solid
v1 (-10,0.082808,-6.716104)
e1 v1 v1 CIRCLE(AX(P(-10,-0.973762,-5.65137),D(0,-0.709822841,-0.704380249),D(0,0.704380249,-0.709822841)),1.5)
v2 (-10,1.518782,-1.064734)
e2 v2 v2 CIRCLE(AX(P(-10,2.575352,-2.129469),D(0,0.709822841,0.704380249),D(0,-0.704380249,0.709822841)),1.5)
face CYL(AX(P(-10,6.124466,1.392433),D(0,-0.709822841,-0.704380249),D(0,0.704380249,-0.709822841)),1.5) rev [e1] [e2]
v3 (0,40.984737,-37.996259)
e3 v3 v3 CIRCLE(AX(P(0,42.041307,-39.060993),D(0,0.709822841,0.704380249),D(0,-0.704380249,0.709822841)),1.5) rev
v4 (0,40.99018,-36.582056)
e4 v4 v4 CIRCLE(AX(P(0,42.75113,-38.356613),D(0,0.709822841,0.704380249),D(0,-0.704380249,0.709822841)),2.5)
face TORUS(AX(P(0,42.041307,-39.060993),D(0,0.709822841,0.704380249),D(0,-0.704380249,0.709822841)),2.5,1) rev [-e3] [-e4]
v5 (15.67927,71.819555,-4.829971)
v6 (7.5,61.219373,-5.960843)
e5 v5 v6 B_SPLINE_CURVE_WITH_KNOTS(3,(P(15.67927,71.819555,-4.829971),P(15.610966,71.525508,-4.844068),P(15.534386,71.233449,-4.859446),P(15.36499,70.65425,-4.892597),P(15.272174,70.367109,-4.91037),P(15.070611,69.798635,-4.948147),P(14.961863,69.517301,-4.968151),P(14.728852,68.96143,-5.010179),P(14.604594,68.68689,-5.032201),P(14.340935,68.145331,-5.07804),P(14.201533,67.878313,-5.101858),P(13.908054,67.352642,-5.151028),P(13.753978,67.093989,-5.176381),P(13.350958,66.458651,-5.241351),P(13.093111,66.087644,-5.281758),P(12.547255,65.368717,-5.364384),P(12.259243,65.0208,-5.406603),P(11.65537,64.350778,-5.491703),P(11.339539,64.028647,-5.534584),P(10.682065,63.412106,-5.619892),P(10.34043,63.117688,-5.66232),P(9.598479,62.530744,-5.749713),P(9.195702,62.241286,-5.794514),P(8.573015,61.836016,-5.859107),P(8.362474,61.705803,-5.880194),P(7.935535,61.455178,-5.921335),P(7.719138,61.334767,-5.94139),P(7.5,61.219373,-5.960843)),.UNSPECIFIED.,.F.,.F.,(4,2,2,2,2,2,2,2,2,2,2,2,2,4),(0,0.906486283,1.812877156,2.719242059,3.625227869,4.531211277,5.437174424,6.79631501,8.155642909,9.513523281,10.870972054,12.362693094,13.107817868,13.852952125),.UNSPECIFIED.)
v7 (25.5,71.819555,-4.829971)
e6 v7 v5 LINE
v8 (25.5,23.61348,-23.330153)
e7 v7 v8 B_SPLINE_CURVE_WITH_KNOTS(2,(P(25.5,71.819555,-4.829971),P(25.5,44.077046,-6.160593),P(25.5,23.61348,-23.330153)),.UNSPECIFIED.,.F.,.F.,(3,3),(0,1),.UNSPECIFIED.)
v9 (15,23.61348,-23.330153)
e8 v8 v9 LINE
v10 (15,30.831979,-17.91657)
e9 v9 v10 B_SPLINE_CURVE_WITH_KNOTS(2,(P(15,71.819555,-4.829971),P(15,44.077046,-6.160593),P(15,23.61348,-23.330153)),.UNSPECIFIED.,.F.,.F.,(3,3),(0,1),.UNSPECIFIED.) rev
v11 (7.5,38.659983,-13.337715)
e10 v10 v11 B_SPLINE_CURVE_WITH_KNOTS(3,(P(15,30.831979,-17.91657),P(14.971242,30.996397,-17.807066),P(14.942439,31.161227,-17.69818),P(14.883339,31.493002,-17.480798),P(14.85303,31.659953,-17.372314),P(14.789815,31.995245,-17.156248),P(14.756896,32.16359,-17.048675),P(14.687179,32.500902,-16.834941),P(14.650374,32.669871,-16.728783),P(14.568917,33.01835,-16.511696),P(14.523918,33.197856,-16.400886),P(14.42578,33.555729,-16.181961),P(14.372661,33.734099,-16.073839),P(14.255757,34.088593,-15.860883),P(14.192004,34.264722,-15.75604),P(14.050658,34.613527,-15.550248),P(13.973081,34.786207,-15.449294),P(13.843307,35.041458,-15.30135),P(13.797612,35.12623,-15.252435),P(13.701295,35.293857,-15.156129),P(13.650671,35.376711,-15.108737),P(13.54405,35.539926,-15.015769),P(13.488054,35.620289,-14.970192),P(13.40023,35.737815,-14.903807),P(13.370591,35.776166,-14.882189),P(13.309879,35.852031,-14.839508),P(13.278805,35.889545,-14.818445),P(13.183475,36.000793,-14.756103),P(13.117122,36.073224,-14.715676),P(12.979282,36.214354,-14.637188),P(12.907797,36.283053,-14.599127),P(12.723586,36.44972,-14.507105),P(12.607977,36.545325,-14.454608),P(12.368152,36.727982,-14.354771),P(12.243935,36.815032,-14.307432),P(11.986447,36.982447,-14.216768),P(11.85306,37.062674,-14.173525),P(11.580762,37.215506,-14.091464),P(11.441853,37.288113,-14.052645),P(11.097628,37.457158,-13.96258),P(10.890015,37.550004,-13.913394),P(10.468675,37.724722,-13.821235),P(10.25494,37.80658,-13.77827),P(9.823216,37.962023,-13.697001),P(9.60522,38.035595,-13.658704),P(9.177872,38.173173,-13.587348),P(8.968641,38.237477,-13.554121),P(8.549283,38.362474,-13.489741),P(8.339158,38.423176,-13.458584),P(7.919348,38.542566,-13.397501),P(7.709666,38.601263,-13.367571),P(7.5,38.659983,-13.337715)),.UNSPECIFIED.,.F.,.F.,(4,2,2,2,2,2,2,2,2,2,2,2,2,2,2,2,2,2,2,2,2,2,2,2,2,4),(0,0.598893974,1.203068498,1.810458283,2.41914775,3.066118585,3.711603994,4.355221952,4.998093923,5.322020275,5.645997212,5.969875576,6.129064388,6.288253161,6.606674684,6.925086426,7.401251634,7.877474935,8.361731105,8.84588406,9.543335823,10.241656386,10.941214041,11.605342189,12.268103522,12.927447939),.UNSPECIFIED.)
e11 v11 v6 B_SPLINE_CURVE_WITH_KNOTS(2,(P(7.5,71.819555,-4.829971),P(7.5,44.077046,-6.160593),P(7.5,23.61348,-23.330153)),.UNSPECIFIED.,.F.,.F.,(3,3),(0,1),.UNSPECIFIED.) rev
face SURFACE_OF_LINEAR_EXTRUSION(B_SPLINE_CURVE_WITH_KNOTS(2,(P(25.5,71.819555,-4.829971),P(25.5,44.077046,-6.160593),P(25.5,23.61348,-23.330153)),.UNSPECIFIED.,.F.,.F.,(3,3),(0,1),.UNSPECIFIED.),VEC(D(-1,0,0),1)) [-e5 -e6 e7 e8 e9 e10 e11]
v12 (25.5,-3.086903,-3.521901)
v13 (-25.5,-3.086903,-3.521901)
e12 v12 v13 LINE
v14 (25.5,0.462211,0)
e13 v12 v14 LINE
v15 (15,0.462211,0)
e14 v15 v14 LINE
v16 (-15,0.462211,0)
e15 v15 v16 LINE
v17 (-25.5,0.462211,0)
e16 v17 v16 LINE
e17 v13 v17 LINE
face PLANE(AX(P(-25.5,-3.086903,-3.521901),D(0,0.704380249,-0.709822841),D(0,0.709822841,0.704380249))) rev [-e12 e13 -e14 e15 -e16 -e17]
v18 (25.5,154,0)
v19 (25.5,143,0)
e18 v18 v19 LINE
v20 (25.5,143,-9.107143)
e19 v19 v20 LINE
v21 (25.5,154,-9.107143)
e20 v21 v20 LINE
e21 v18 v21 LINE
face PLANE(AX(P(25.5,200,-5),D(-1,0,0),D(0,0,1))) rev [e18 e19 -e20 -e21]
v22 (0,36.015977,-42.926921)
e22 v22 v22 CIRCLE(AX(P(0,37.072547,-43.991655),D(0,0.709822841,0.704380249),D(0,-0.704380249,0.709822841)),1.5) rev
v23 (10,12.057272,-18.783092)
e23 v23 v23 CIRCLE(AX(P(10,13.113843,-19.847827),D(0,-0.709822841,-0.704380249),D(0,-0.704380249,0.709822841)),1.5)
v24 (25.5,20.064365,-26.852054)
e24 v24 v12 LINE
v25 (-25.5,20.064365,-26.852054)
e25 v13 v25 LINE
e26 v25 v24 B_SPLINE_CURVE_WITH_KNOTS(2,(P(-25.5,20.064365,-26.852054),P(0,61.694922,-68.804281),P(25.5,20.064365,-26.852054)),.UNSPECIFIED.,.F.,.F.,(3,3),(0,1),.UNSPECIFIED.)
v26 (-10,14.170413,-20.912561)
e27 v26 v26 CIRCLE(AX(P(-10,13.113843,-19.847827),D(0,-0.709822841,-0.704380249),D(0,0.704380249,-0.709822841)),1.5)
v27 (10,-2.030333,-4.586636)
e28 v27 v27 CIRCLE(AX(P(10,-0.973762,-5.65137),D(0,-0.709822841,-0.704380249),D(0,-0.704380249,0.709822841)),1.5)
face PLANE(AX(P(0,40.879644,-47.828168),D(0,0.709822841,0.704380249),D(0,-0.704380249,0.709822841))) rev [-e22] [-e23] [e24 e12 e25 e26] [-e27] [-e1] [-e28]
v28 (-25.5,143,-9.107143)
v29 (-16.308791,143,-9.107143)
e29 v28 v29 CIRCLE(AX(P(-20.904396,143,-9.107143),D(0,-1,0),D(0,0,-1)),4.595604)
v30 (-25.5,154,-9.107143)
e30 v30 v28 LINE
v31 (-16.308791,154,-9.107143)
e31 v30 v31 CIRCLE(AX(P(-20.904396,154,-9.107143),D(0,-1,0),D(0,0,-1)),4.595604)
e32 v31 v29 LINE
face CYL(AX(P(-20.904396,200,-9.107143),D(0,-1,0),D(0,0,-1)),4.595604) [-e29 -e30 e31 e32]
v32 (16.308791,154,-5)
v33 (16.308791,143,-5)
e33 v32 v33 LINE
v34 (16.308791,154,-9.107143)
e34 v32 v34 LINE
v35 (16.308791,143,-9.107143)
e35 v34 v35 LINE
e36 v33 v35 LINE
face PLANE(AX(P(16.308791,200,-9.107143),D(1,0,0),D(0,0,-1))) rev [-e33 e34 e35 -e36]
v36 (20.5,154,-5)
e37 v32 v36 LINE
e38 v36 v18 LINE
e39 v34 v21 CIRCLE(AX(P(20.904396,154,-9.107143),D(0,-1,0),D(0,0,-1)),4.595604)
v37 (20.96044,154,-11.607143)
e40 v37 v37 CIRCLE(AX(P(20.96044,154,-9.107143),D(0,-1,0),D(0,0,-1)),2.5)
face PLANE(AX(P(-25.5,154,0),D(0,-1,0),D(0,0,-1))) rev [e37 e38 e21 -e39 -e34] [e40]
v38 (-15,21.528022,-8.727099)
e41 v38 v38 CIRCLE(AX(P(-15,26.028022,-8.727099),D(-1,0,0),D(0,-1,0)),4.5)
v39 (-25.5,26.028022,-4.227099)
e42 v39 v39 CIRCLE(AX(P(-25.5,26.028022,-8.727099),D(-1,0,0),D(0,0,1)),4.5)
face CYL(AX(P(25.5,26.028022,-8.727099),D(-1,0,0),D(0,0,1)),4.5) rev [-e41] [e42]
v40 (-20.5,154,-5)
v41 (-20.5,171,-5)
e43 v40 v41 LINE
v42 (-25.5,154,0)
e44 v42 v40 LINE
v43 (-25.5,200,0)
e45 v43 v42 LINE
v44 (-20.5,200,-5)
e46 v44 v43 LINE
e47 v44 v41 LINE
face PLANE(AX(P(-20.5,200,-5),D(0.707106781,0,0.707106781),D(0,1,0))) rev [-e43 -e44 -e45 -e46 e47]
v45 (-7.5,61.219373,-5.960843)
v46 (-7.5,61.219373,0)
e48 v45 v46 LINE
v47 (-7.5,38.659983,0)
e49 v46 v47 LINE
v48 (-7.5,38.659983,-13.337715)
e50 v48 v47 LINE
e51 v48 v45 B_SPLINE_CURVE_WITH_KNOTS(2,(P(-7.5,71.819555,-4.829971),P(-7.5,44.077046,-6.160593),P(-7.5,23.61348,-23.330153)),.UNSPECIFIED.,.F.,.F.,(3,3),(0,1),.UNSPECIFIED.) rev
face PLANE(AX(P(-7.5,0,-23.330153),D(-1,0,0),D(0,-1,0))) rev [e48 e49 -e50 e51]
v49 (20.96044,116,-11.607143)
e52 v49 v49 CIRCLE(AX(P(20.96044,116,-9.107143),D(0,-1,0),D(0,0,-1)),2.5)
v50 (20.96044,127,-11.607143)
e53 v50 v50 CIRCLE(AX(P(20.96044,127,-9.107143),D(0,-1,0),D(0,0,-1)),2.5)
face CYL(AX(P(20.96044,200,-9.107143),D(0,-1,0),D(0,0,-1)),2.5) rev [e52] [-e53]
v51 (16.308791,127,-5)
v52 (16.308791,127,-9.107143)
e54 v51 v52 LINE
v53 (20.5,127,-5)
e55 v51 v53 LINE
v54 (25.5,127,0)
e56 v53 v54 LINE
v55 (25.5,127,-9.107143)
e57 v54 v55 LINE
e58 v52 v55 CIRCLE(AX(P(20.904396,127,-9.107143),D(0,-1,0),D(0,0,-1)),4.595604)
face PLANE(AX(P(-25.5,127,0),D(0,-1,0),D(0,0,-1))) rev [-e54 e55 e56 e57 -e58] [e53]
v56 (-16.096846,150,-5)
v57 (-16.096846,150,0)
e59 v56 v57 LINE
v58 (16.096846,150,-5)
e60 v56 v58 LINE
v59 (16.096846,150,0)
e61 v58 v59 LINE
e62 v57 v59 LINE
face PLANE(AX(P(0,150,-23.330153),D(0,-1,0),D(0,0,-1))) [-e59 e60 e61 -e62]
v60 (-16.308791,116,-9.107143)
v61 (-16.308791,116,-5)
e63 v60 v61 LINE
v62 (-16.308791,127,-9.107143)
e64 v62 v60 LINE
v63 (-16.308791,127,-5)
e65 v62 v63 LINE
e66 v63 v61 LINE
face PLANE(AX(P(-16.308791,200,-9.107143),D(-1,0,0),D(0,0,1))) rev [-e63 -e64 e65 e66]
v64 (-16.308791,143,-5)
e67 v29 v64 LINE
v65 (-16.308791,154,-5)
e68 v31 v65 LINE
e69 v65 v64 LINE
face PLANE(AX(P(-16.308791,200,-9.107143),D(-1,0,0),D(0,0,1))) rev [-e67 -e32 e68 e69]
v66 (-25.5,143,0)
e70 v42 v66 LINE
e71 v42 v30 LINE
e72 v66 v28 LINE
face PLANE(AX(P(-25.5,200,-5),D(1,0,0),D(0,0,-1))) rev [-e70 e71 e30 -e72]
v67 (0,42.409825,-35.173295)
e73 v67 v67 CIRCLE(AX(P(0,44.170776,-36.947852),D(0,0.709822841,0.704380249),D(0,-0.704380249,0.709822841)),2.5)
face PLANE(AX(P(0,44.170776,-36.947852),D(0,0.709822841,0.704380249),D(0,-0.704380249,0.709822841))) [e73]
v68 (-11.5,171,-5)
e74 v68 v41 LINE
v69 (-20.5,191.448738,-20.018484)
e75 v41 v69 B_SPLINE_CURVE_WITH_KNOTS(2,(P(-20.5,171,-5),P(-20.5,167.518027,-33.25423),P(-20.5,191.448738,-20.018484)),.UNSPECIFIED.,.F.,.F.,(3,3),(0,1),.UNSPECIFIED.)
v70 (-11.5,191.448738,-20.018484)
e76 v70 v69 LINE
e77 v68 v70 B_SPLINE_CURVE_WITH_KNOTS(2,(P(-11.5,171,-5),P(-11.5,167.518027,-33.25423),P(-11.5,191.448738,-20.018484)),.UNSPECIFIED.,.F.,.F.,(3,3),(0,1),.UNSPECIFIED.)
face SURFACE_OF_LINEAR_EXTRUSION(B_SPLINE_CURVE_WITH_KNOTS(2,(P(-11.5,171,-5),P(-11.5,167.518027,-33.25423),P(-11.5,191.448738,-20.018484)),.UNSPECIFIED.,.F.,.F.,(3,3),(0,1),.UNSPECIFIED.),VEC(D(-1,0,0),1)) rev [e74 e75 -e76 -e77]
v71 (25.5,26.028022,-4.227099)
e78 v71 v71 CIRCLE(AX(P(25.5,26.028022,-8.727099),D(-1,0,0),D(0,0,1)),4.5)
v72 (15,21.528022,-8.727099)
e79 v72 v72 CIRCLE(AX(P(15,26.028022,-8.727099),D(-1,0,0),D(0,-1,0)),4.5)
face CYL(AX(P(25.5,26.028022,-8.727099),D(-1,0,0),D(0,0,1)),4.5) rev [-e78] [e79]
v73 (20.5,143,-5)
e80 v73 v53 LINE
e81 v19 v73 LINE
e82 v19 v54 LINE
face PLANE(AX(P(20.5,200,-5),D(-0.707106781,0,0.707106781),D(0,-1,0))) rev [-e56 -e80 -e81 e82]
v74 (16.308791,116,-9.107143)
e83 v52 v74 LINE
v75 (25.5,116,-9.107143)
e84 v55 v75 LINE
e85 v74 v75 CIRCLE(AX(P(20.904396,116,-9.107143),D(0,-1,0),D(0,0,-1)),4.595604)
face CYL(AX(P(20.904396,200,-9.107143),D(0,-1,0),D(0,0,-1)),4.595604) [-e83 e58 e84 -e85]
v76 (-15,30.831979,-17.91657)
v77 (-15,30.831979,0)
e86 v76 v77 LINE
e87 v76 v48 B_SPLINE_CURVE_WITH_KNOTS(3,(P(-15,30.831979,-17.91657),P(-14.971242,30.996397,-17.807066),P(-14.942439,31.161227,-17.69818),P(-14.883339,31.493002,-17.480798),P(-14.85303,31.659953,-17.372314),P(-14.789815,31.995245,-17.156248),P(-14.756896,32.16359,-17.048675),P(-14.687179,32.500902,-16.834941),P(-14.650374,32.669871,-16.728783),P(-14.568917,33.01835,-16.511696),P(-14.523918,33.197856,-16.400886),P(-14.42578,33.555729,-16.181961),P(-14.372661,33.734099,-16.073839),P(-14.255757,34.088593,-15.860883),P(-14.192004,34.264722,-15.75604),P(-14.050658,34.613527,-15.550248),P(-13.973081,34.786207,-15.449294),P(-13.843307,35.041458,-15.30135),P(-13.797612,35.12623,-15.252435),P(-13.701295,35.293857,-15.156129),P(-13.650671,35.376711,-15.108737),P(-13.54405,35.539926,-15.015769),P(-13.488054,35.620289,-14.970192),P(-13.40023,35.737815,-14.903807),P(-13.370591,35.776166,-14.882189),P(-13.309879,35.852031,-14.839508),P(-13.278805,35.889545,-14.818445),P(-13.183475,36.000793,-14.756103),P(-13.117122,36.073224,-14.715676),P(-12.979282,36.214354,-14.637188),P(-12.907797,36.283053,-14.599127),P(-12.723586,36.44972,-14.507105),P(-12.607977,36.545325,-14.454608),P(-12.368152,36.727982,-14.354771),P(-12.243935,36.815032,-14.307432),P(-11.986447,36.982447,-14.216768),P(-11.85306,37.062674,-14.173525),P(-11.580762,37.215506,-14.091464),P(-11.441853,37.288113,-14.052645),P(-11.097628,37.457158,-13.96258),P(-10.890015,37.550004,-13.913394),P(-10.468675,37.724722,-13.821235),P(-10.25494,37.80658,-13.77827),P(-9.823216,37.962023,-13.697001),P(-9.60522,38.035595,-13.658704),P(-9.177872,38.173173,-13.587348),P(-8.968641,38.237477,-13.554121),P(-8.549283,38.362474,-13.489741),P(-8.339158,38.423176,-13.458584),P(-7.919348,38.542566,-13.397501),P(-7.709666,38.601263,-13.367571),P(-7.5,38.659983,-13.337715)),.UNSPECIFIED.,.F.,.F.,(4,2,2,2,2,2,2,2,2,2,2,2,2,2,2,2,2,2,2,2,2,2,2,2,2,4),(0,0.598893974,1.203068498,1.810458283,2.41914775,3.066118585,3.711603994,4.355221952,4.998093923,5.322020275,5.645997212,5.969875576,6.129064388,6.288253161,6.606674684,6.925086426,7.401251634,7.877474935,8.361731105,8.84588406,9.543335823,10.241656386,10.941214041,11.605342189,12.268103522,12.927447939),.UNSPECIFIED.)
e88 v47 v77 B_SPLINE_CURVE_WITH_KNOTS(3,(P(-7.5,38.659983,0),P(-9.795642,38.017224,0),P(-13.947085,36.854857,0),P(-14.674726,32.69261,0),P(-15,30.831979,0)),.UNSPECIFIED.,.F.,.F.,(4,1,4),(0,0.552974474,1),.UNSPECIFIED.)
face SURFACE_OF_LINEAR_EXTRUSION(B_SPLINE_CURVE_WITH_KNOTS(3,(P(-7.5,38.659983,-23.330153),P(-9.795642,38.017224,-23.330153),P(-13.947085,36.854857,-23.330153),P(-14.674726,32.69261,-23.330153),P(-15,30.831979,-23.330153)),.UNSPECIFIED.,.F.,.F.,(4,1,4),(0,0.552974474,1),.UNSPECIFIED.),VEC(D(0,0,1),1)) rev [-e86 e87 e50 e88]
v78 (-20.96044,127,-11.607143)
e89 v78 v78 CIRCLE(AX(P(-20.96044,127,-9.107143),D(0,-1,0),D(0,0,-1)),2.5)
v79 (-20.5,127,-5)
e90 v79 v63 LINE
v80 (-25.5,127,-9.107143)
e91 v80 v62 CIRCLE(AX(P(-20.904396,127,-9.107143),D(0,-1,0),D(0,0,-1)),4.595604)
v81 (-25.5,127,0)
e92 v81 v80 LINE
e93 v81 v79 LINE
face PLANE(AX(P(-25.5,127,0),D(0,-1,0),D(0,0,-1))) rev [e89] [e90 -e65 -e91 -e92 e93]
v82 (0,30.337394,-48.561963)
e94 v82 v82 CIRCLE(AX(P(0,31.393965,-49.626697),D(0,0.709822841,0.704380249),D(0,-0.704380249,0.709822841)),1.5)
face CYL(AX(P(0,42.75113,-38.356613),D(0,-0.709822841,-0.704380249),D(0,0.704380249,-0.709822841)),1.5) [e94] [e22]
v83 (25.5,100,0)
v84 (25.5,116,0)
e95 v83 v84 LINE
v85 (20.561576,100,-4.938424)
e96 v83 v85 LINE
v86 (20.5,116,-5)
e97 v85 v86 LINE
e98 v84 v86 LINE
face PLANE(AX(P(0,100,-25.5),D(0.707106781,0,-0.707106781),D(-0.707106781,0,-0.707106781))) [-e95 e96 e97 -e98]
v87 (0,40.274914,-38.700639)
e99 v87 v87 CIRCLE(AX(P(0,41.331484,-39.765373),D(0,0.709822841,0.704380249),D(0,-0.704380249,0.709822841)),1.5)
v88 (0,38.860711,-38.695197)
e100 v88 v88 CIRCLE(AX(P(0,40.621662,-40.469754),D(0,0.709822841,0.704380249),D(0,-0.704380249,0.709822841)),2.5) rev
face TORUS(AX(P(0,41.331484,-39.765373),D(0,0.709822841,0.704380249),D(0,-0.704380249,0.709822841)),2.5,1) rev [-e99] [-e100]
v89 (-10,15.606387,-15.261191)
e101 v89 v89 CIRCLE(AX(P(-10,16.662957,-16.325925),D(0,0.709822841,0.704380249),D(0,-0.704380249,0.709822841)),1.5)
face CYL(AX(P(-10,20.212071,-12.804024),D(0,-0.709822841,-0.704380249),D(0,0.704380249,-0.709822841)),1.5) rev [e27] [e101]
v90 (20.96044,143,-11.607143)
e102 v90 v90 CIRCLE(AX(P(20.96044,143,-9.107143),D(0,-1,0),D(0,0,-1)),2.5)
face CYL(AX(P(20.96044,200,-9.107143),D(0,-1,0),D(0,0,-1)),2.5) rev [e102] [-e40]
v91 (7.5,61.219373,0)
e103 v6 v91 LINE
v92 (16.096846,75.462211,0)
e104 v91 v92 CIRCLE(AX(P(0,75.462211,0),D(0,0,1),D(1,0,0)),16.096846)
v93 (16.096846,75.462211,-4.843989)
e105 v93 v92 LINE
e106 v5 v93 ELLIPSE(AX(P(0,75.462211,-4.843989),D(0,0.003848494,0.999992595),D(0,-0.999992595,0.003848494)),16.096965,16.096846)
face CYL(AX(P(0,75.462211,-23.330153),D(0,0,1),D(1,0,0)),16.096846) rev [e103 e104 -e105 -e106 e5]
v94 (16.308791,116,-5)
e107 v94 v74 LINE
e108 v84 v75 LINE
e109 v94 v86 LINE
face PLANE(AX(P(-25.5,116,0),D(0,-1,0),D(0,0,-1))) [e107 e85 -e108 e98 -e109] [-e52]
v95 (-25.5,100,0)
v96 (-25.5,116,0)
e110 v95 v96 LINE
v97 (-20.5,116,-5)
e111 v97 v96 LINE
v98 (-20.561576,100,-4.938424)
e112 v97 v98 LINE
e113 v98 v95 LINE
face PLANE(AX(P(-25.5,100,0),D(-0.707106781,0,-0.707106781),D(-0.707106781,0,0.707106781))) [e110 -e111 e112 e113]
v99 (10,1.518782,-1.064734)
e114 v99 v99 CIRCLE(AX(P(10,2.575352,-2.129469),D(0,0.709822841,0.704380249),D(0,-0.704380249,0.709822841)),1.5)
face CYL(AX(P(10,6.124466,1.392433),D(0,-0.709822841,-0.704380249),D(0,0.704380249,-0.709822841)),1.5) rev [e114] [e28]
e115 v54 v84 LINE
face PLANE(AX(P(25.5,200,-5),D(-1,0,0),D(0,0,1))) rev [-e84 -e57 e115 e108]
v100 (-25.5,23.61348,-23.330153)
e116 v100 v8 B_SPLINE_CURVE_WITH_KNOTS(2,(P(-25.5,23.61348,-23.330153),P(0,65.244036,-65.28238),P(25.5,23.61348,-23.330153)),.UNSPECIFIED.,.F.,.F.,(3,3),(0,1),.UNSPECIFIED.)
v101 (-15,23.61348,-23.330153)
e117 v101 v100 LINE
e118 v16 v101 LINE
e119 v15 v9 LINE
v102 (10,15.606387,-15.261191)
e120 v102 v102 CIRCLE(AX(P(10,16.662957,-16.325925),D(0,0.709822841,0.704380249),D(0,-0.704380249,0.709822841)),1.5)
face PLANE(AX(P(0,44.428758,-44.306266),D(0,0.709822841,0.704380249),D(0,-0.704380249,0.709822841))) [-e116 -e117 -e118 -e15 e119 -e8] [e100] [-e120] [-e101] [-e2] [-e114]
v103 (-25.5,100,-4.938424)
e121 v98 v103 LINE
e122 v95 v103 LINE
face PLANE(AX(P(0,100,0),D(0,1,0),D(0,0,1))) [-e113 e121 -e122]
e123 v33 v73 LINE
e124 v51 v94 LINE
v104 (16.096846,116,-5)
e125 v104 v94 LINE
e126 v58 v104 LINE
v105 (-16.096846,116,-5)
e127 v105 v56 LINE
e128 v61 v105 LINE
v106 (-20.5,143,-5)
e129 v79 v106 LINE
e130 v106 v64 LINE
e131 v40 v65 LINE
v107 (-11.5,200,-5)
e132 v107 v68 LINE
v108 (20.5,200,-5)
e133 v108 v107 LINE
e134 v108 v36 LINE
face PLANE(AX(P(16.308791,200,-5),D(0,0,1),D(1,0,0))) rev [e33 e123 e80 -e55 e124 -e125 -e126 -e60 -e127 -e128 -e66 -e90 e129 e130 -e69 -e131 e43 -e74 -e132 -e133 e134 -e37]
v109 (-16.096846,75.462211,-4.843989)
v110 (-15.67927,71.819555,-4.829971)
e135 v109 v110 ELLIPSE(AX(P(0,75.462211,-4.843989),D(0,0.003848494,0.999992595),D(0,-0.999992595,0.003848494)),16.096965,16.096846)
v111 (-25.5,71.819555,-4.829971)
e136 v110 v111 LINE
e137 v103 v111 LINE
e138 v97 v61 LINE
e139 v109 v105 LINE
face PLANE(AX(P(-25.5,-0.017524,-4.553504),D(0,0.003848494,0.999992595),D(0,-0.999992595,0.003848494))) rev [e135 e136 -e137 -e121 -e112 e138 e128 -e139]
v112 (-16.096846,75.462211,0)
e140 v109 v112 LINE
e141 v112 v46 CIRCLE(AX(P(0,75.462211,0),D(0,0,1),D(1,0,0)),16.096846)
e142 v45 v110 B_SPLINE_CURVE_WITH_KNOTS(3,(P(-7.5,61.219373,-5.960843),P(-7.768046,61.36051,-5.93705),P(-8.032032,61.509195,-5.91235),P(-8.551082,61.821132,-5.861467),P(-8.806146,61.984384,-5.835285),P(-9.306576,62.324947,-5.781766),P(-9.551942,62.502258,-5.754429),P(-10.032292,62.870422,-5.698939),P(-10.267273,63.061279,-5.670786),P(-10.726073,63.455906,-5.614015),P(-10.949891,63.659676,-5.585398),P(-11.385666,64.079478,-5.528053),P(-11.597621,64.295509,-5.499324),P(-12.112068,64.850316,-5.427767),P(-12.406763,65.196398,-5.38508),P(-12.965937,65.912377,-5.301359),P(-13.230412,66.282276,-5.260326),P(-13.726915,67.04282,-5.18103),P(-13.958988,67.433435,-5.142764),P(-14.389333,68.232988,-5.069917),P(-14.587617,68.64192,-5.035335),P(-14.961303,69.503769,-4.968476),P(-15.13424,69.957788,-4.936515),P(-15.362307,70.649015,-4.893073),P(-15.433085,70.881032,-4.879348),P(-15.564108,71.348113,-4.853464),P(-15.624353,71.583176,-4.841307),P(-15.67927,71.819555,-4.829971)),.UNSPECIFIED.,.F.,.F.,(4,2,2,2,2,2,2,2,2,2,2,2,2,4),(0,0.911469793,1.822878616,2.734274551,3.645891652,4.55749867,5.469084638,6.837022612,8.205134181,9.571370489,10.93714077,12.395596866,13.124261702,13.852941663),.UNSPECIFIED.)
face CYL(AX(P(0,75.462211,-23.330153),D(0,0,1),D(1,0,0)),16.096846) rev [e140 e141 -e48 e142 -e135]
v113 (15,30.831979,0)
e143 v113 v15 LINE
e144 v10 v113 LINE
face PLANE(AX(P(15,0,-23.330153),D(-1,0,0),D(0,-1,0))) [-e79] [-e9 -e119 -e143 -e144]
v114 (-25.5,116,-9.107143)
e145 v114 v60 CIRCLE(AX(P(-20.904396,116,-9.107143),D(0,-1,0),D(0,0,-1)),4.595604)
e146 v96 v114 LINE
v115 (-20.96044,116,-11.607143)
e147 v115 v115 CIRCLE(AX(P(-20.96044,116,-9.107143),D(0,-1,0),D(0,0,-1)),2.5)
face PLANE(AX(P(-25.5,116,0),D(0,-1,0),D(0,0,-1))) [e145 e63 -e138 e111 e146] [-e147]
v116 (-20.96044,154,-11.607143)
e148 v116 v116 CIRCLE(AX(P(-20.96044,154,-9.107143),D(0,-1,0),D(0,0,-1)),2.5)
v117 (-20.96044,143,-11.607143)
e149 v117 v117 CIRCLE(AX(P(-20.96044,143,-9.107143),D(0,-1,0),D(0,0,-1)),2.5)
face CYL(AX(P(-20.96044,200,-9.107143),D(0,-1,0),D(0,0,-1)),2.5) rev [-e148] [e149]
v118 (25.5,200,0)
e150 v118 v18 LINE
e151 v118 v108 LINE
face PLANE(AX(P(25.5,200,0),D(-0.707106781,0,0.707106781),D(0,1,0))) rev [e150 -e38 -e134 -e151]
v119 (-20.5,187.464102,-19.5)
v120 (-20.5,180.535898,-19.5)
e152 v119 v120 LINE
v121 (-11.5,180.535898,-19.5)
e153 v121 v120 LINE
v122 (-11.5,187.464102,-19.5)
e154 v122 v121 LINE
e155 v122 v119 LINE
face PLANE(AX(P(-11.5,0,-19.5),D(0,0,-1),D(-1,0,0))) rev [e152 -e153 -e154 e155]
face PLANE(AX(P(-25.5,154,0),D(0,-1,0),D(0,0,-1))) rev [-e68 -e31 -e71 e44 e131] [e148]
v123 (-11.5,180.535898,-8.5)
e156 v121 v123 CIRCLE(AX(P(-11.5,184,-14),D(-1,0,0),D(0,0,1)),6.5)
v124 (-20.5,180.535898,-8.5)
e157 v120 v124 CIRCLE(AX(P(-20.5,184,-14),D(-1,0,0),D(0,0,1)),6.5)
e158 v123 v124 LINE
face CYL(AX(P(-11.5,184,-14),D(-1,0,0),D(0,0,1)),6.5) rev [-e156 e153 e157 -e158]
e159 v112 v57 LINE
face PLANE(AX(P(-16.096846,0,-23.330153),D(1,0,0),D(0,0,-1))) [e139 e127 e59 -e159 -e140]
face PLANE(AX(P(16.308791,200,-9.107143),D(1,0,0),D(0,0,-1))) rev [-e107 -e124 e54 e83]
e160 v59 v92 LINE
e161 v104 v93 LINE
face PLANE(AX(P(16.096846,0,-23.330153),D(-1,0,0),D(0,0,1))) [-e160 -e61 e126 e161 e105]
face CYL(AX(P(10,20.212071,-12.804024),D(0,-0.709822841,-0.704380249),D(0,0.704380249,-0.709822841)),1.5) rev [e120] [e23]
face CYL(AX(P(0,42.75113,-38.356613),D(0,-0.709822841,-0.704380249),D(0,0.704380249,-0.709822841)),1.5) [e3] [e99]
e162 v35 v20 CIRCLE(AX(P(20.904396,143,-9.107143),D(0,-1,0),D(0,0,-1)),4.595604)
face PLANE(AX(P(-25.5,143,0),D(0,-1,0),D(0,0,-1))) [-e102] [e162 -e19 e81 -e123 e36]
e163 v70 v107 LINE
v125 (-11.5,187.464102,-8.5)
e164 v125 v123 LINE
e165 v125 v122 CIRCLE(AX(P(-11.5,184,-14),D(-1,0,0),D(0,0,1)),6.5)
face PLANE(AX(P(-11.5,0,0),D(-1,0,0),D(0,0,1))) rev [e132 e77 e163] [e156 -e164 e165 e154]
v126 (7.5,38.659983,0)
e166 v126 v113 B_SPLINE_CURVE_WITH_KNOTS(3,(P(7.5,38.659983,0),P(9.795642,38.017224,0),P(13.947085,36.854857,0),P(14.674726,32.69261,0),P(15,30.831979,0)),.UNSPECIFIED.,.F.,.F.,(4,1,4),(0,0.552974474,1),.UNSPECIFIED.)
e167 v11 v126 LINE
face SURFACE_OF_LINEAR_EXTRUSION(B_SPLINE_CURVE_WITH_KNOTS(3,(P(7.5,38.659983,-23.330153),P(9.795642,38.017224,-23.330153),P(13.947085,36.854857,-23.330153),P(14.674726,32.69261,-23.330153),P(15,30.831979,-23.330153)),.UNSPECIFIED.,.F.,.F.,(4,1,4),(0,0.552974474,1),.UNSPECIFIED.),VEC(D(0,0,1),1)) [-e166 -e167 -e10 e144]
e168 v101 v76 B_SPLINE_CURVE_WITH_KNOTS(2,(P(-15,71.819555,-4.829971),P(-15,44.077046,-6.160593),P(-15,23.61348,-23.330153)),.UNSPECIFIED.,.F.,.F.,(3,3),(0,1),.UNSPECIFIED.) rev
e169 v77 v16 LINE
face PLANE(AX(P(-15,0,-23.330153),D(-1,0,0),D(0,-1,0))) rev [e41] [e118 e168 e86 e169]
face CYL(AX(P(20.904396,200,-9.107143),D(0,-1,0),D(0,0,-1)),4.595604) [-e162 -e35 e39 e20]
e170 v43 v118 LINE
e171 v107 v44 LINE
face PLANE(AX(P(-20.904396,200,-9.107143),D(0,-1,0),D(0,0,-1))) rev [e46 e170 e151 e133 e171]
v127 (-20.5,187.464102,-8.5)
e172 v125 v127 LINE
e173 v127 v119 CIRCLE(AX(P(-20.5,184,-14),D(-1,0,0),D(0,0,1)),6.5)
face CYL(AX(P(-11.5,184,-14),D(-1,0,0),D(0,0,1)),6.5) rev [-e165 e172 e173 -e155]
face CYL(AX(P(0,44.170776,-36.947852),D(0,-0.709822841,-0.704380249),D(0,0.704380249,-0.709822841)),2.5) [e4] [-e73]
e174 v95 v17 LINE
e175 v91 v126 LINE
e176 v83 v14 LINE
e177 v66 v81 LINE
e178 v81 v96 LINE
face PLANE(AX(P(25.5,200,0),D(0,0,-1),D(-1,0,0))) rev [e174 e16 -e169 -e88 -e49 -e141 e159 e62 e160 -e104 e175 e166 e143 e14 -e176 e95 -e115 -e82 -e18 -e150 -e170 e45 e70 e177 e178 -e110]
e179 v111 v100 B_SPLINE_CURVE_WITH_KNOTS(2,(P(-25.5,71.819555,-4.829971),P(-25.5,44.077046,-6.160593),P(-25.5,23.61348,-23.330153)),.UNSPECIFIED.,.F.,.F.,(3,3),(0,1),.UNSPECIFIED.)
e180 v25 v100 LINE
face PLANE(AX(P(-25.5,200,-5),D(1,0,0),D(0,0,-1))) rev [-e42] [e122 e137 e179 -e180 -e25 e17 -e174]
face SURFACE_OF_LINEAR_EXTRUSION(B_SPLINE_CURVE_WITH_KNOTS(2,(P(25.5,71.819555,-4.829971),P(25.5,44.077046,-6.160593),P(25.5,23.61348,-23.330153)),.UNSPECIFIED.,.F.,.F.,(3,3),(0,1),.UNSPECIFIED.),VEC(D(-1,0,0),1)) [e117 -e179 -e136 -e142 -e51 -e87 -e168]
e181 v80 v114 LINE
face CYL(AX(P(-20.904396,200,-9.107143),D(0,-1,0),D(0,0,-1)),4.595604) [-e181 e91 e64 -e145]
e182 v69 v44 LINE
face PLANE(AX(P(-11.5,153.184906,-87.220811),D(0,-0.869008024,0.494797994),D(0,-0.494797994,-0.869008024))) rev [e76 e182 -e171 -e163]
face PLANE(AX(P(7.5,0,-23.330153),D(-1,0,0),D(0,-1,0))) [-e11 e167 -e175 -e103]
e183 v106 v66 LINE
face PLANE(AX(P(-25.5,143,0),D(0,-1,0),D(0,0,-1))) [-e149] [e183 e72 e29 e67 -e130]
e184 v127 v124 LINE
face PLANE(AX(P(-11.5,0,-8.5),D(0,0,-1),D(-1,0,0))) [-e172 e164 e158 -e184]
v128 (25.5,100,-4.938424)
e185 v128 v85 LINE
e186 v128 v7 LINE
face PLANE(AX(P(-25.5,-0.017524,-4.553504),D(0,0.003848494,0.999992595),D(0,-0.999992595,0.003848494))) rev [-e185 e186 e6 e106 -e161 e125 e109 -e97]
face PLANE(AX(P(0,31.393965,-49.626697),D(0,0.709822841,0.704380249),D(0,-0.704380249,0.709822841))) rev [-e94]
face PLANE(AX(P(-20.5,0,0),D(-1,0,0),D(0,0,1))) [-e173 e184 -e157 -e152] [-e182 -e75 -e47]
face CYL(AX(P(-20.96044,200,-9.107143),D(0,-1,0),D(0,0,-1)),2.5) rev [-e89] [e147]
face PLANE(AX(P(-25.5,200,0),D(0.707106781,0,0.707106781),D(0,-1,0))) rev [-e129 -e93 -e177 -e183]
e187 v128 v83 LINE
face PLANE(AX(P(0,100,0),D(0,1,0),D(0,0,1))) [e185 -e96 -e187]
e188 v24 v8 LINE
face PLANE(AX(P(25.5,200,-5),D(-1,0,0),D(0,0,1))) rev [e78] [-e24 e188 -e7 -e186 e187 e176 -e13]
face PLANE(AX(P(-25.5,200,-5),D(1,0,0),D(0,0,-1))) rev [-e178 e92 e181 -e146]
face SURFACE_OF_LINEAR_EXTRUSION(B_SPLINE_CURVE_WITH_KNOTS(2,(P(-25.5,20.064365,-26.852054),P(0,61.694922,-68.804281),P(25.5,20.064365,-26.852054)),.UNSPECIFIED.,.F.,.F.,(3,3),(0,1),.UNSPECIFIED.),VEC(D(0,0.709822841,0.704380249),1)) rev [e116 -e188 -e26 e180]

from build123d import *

# Parameters (mm, degrees)
SKETCH1_R           = 2.5
BOSS_EXTRUDE1_DEPTH = 200
SKETCH4_W           = 8.702747253
SKETCH4_H           = 30
SKETCH4_H_2         = 16
CUT_EXTRUDE4_DEPTH  = 207.854454345
CHAMFER2_SIZE       = 5
CHAMFER2_SIZE_2     = 5.019354123
BOSS_EXTRUDE2_DEPTH = 51
CUT_EXTRUDE5_DEPTH  = 203.964396132
SKETCH8_R           = 4.5
CUT_EXTRUDE6_DEPTH  = 208.714458096
BOSS_EXTRUDE3_DEPTH = 5
BOSS_EXTRUDE4_START = -13
SKETCH10_R          = 1.5
BOSS_EXTRUDE4_DEPTH = 16
CHAMFER11_SIZE      = 5
SKETCH11_R          = 2.5
BOSS_EXTRUDE5_DEPTH = 2
FILLET1_R           = 1
BOSS_EXTRUDE6_START = -5
BOSS_EXTRUDE6_DEPTH = 9
SKETCH14_R          = 1.5
CUT_EXTRUDE7_DEPTH  = 10
CUT_EXTRUDE8_START  = -84
CUT_EXTRUDE8_DEPTH  = 16


# Some blends are built 0.0001 mm under size
with BuildPart() as part:
    # Sketch1 → Boss-Extrude1 (new body)
    with BuildSketch(Plane(origin=(0, 0, 0), x_dir=(1, 0, 0), z_dir=(0, 1, 0))):
        with BuildLine():
            Line((-25.5, 5), (-25.5, 9.107142857))
            ThreePointArc((-25.5, 9.107142857), (-20.904395604, 13.702747253), (-16.308791209, 9.107142857))
            Line((-16.308791209, 9.107142857), (-16.308791209, 5))
            Line((-16.308791209, 5), (16.308791209, 5))
            Line((16.308791209, 5), (16.308791209, 9.107142857))
            ThreePointArc((16.308791209, 9.107142857), (20.904395604, 13.702747253), (25.5, 9.107142857))
            Line((25.5, 9.107142857), (25.5, 5))
            Line((25.5, 5), (25.5, 0))
            Line((25.5, 0), (-25.5, 0))
            Line((-25.5, 0), (-25.5, 5))
        make_face()
        with Locations(Location((-20.96043956, 9.107142857, 0), (0, 0, 270))):
            Circle(SKETCH1_R, mode=Mode.SUBTRACT)
        with Locations(Location((20.96043956, 9.107142857, 0), (0, 0, 90))):
            Circle(SKETCH1_R, mode=Mode.SUBTRACT)
    extrude(amount=BOSS_EXTRUDE1_DEPTH)

    # Sketch4 → Cut-Extrude4 (cut, through all)
    with BuildSketch(Plane(origin=(25.5, 0, 0), x_dir=(0, 0, -1), z_dir=(1, 0, 0))):
        with Locations((9.351373626, 185)):
            Rectangle(SKETCH4_W, SKETCH4_H)
        with Locations((9.351373626, 162)):
            Rectangle(SKETCH4_W, SKETCH4_H_2)
        with Locations((9.351373626, 135)):
            Rectangle(SKETCH4_W, SKETCH4_H_2)
        with Locations((9.351373626, 108)):
            Rectangle(SKETCH4_W, SKETCH4_H_2)
        Polygon((5, 100), (5, 116), (4.553571429, 0), (13.702747253, 0), (13.702747253, 100), align=None)
    extrude(amount=-CUT_EXTRUDE4_DEPTH, mode=Mode.SUBTRACT)

    # Chamfer2
    # the kernel refuses this chamfer: 5.019354123, 5 mm, written as the material it takes off along each edge
    with BuildSketch(Plane(origin=(38.409512828, 0, -4.553571429), x_dir=(0, 0.9995054486557426, -0.03144611434633402), z_dir=(-1, 0, 0))) as chamfer2_piece_1:
        Polygon((CHAMFER2_SIZE * 0.999619067011, -CHAMFER2_SIZE * 0.0275992910832), (-CHAMFER2_SIZE_2 * 0.0314461143481, -CHAMFER2_SIZE_2 * 0.999505448712), (0, 0), align=None)
    extrude(amount=76.819025655, mode=Mode.SUBTRACT)

    # Sketch7 → Boss-Extrude2 (add, through all)
    with BuildSketch(Plane.ZY.offset(25.5)):
        with BuildLine():
            Line((-4.572813897, 4.999962973), (-23.330153181, 23.613479688))
            add(Edge.make_bspline(
                [(-23.330153181, 23.613479688), (-6.160592573, 44.077045925), (-4.829970579, 71.819555154)],
                knots=[0, 0, 0, 1, 1, 1], degree=2))
            Line((-4.829970579, 71.819555154), (-4.572813897, 4.999962973))
        make_face()
    extrude(amount=-BOSS_EXTRUDE2_DEPTH)

    # Sketch5 → Cut-Extrude5 (cut, through all)
    with BuildSketch(Plane.XY):
        with BuildLine():
            Line((-16.096845958, 150), (-16.096845958, 75.462211289))
            ThreePointArc((-16.096845958, 75.462211289), (-13.78105211, 67.144095363), (-7.5, 61.219372745))
            Line((-7.5, 61.219372745), (-7.5, 38.659982869))
            add(Edge.make_bspline(
                [(-7.5, 38.659982869), (-9.795642151, 38.017223862), (-13.947085411, 36.854857355), (-14.674726057, 32.692610158), (-15, 30.831979414)],
                knots=[0, 0, 0, 0, 0.552974474, 1, 1, 1, 1], degree=3))
            Line((-15, 30.831979414), (-15, 0))
            Line((-15, 0), (15, 0))
            Line((15, 0), (15, 30.831979414))
            add(Edge.make_bspline(
                [(7.5, 38.659982869), (9.795642151, 38.017223862), (13.947085411, 36.854857355), (14.674726057, 32.692610158), (15, 30.831979414)],
                knots=[0, 0, 0, 0, 0.552974474, 1, 1, 1, 1], degree=3))
            Line((7.5, 38.659982869), (7.5, 61.219372745))
            ThreePointArc((7.5, 61.219372745), (13.78105211, 67.144095363), (16.096845958, 75.462211289))
            Line((16.096845958, 75.462211289), (16.096845958, 150))
            Line((16.096845958, 150), (-16.096845958, 150))
        make_face()
    extrude(amount=-CUT_EXTRUDE5_DEPTH, mode=Mode.SUBTRACT)

    # Sketch8 → Cut-Extrude6 (cut, through all)
    with BuildSketch(Plane.ZY.offset(25.5)):
        with Locations((-8.727098944, 26.028021636)):
            Circle(SKETCH8_R)
    extrude(amount=-CUT_EXTRUDE6_DEPTH, mode=Mode.SUBTRACT)

    # Sketch9 → Boss-Extrude3 (add)
    with BuildSketch(Plane(origin=(0, 0.232884449, 0.231098799), x_dir=(1, 0, 0), z_dir=(0, -0.7098228406915363, -0.7043802487524746))):
        with BuildLine():
            Line((-25.5, -0.325572503), (-25.5, -33.193144301))
            add(Edge.make_bspline(
                [(-25.5, -33.193144301), (0, -92.295534264), (25.5, -33.193144301)],
                knots=[0, 0, 0, 1, 1, 1], degree=2))
            Line((25.5, -33.193144301), (25.5, -0.325572503))
            Line((25.5, -0.325572503), (-25.5, -0.325572503))
        make_face()
    extrude(amount=BOSS_EXTRUDE3_DEPTH)

    # Sketch10 → Boss-Extrude4 (add)
    with BuildSketch(Plane(origin=(0, 0.232884449, 0.231098799), x_dir=(1, 0, 0), z_dir=(0, 0.7098228406915363, 0.7043802487524746)).offset(BOSS_EXTRUDE4_START)):
        with Locations(Location((0, 57.339451639, 0), (0, 0, 270))):
            Circle(SKETCH10_R)
    extrude(amount=BOSS_EXTRUDE4_DEPTH)

    # Chamfer11
    chamfer11_edges = [part.edges().sort_by_distance(p)[0] for p in [
        (25.5, 135, -5),
        (25.5, 177, -5),
        (-25.5, 135, -5),
        (-25.5, 177, -5),
    ]]
    chamfer(chamfer11_edges, length=CHAMFER11_SIZE - 0.0001)  # a hair under: the kernel refuses the full size

    # Sketch11 → Boss-Extrude5 (add)
    with BuildSketch(Plane(origin=(0, 2.362352971, 2.344239545), x_dir=(1, 0, 0), z_dir=(0, 0.7098228406915363, 0.7043802487524746))):
        with Locations(Location((0, 57.339451639, 0), (0, 0, 270))):
            Circle(SKETCH11_R)
    extrude(amount=BOSS_EXTRUDE5_DEPTH)

    # Fillet1
    fillet1_edges = [part.edges().sort_by_distance(p)[0] for p in [
        (0, 41.678232031, -41.534487908),
        (0, 43.807700553, -39.421347162),
    ]]
    fillet(fillet1_edges, radius=FILLET1_R - 0.0001)  # a hair under: the kernel refuses the full size

    # Sketch13 → Boss-Extrude6 (add)
    with BuildSketch(Plane.ZY.offset(25.5).offset(BOSS_EXTRUDE6_START)):
        with BuildLine():
            Line((-5, 171), (-5, 200))
            Line((-5, 200), (-20.018483641, 191.448737676))
            add(Edge.make_bspline(
                [(-5, 171), (-33.25422997, 167.518026698), (-20.018483641, 191.448737676)],
                knots=[0, 0, 0, 1, 1, 1], degree=2))
        make_face()
        with BuildLine():
            Line((-19.5, 180.535898385), (-19.5, 187.464101615))
            ThreePointArc((-19.5, 187.464101615), (-14, 190.5), (-8.5, 187.464101615))
            Line((-8.5, 187.464101615), (-8.5, 180.535898385))
            ThreePointArc((-8.5, 180.535898385), (-14, 177.5), (-19.5, 180.535898385))
        make_face(mode=Mode.SUBTRACT)
    extrude(amount=-BOSS_EXTRUDE6_DEPTH)

    # Sketch14 → Cut-Extrude7 (cut)
    with BuildSketch(Plane(origin=(0, -3.316229755, -3.290802445), x_dir=(1, 0, 0), z_dir=(0, -0.7098228406915363, -0.7043802487524746))):
        with Locations(Location((-10, -3.325572503, 0), (0, 0, 270))):
            Circle(SKETCH14_R)
        with Locations(Location((-10, -23.325572503, 0), (0, 0, 270))):
            Circle(SKETCH14_R)
        with Locations(Location((10, -23.325572503, 0), (0, 0, 90))):
            Circle(SKETCH14_R)
        with Locations(Location((10, -3.325572503, 0), (0, 0, 90))):
            Circle(SKETCH14_R)
    extrude(amount=-CUT_EXTRUDE7_DEPTH, mode=Mode.SUBTRACT)

    # Sketch15 → Cut-Extrude8 (cut)
    with BuildSketch(Plane(origin=(0, 200, 0), x_dir=(1, 0, 0), z_dir=(0, 1, 0)).offset(CUT_EXTRUDE8_START)):
        Polygon((25.5, 0), (20.5, 5), (25.5, 5), align=None)
        Polygon((-20.5, 5), (-25.5, 0), (-25.5, 5), align=None)
    extrude(amount=-CUT_EXTRUDE8_DEPTH, mode=Mode.SUBTRACT)


solid = part.part
